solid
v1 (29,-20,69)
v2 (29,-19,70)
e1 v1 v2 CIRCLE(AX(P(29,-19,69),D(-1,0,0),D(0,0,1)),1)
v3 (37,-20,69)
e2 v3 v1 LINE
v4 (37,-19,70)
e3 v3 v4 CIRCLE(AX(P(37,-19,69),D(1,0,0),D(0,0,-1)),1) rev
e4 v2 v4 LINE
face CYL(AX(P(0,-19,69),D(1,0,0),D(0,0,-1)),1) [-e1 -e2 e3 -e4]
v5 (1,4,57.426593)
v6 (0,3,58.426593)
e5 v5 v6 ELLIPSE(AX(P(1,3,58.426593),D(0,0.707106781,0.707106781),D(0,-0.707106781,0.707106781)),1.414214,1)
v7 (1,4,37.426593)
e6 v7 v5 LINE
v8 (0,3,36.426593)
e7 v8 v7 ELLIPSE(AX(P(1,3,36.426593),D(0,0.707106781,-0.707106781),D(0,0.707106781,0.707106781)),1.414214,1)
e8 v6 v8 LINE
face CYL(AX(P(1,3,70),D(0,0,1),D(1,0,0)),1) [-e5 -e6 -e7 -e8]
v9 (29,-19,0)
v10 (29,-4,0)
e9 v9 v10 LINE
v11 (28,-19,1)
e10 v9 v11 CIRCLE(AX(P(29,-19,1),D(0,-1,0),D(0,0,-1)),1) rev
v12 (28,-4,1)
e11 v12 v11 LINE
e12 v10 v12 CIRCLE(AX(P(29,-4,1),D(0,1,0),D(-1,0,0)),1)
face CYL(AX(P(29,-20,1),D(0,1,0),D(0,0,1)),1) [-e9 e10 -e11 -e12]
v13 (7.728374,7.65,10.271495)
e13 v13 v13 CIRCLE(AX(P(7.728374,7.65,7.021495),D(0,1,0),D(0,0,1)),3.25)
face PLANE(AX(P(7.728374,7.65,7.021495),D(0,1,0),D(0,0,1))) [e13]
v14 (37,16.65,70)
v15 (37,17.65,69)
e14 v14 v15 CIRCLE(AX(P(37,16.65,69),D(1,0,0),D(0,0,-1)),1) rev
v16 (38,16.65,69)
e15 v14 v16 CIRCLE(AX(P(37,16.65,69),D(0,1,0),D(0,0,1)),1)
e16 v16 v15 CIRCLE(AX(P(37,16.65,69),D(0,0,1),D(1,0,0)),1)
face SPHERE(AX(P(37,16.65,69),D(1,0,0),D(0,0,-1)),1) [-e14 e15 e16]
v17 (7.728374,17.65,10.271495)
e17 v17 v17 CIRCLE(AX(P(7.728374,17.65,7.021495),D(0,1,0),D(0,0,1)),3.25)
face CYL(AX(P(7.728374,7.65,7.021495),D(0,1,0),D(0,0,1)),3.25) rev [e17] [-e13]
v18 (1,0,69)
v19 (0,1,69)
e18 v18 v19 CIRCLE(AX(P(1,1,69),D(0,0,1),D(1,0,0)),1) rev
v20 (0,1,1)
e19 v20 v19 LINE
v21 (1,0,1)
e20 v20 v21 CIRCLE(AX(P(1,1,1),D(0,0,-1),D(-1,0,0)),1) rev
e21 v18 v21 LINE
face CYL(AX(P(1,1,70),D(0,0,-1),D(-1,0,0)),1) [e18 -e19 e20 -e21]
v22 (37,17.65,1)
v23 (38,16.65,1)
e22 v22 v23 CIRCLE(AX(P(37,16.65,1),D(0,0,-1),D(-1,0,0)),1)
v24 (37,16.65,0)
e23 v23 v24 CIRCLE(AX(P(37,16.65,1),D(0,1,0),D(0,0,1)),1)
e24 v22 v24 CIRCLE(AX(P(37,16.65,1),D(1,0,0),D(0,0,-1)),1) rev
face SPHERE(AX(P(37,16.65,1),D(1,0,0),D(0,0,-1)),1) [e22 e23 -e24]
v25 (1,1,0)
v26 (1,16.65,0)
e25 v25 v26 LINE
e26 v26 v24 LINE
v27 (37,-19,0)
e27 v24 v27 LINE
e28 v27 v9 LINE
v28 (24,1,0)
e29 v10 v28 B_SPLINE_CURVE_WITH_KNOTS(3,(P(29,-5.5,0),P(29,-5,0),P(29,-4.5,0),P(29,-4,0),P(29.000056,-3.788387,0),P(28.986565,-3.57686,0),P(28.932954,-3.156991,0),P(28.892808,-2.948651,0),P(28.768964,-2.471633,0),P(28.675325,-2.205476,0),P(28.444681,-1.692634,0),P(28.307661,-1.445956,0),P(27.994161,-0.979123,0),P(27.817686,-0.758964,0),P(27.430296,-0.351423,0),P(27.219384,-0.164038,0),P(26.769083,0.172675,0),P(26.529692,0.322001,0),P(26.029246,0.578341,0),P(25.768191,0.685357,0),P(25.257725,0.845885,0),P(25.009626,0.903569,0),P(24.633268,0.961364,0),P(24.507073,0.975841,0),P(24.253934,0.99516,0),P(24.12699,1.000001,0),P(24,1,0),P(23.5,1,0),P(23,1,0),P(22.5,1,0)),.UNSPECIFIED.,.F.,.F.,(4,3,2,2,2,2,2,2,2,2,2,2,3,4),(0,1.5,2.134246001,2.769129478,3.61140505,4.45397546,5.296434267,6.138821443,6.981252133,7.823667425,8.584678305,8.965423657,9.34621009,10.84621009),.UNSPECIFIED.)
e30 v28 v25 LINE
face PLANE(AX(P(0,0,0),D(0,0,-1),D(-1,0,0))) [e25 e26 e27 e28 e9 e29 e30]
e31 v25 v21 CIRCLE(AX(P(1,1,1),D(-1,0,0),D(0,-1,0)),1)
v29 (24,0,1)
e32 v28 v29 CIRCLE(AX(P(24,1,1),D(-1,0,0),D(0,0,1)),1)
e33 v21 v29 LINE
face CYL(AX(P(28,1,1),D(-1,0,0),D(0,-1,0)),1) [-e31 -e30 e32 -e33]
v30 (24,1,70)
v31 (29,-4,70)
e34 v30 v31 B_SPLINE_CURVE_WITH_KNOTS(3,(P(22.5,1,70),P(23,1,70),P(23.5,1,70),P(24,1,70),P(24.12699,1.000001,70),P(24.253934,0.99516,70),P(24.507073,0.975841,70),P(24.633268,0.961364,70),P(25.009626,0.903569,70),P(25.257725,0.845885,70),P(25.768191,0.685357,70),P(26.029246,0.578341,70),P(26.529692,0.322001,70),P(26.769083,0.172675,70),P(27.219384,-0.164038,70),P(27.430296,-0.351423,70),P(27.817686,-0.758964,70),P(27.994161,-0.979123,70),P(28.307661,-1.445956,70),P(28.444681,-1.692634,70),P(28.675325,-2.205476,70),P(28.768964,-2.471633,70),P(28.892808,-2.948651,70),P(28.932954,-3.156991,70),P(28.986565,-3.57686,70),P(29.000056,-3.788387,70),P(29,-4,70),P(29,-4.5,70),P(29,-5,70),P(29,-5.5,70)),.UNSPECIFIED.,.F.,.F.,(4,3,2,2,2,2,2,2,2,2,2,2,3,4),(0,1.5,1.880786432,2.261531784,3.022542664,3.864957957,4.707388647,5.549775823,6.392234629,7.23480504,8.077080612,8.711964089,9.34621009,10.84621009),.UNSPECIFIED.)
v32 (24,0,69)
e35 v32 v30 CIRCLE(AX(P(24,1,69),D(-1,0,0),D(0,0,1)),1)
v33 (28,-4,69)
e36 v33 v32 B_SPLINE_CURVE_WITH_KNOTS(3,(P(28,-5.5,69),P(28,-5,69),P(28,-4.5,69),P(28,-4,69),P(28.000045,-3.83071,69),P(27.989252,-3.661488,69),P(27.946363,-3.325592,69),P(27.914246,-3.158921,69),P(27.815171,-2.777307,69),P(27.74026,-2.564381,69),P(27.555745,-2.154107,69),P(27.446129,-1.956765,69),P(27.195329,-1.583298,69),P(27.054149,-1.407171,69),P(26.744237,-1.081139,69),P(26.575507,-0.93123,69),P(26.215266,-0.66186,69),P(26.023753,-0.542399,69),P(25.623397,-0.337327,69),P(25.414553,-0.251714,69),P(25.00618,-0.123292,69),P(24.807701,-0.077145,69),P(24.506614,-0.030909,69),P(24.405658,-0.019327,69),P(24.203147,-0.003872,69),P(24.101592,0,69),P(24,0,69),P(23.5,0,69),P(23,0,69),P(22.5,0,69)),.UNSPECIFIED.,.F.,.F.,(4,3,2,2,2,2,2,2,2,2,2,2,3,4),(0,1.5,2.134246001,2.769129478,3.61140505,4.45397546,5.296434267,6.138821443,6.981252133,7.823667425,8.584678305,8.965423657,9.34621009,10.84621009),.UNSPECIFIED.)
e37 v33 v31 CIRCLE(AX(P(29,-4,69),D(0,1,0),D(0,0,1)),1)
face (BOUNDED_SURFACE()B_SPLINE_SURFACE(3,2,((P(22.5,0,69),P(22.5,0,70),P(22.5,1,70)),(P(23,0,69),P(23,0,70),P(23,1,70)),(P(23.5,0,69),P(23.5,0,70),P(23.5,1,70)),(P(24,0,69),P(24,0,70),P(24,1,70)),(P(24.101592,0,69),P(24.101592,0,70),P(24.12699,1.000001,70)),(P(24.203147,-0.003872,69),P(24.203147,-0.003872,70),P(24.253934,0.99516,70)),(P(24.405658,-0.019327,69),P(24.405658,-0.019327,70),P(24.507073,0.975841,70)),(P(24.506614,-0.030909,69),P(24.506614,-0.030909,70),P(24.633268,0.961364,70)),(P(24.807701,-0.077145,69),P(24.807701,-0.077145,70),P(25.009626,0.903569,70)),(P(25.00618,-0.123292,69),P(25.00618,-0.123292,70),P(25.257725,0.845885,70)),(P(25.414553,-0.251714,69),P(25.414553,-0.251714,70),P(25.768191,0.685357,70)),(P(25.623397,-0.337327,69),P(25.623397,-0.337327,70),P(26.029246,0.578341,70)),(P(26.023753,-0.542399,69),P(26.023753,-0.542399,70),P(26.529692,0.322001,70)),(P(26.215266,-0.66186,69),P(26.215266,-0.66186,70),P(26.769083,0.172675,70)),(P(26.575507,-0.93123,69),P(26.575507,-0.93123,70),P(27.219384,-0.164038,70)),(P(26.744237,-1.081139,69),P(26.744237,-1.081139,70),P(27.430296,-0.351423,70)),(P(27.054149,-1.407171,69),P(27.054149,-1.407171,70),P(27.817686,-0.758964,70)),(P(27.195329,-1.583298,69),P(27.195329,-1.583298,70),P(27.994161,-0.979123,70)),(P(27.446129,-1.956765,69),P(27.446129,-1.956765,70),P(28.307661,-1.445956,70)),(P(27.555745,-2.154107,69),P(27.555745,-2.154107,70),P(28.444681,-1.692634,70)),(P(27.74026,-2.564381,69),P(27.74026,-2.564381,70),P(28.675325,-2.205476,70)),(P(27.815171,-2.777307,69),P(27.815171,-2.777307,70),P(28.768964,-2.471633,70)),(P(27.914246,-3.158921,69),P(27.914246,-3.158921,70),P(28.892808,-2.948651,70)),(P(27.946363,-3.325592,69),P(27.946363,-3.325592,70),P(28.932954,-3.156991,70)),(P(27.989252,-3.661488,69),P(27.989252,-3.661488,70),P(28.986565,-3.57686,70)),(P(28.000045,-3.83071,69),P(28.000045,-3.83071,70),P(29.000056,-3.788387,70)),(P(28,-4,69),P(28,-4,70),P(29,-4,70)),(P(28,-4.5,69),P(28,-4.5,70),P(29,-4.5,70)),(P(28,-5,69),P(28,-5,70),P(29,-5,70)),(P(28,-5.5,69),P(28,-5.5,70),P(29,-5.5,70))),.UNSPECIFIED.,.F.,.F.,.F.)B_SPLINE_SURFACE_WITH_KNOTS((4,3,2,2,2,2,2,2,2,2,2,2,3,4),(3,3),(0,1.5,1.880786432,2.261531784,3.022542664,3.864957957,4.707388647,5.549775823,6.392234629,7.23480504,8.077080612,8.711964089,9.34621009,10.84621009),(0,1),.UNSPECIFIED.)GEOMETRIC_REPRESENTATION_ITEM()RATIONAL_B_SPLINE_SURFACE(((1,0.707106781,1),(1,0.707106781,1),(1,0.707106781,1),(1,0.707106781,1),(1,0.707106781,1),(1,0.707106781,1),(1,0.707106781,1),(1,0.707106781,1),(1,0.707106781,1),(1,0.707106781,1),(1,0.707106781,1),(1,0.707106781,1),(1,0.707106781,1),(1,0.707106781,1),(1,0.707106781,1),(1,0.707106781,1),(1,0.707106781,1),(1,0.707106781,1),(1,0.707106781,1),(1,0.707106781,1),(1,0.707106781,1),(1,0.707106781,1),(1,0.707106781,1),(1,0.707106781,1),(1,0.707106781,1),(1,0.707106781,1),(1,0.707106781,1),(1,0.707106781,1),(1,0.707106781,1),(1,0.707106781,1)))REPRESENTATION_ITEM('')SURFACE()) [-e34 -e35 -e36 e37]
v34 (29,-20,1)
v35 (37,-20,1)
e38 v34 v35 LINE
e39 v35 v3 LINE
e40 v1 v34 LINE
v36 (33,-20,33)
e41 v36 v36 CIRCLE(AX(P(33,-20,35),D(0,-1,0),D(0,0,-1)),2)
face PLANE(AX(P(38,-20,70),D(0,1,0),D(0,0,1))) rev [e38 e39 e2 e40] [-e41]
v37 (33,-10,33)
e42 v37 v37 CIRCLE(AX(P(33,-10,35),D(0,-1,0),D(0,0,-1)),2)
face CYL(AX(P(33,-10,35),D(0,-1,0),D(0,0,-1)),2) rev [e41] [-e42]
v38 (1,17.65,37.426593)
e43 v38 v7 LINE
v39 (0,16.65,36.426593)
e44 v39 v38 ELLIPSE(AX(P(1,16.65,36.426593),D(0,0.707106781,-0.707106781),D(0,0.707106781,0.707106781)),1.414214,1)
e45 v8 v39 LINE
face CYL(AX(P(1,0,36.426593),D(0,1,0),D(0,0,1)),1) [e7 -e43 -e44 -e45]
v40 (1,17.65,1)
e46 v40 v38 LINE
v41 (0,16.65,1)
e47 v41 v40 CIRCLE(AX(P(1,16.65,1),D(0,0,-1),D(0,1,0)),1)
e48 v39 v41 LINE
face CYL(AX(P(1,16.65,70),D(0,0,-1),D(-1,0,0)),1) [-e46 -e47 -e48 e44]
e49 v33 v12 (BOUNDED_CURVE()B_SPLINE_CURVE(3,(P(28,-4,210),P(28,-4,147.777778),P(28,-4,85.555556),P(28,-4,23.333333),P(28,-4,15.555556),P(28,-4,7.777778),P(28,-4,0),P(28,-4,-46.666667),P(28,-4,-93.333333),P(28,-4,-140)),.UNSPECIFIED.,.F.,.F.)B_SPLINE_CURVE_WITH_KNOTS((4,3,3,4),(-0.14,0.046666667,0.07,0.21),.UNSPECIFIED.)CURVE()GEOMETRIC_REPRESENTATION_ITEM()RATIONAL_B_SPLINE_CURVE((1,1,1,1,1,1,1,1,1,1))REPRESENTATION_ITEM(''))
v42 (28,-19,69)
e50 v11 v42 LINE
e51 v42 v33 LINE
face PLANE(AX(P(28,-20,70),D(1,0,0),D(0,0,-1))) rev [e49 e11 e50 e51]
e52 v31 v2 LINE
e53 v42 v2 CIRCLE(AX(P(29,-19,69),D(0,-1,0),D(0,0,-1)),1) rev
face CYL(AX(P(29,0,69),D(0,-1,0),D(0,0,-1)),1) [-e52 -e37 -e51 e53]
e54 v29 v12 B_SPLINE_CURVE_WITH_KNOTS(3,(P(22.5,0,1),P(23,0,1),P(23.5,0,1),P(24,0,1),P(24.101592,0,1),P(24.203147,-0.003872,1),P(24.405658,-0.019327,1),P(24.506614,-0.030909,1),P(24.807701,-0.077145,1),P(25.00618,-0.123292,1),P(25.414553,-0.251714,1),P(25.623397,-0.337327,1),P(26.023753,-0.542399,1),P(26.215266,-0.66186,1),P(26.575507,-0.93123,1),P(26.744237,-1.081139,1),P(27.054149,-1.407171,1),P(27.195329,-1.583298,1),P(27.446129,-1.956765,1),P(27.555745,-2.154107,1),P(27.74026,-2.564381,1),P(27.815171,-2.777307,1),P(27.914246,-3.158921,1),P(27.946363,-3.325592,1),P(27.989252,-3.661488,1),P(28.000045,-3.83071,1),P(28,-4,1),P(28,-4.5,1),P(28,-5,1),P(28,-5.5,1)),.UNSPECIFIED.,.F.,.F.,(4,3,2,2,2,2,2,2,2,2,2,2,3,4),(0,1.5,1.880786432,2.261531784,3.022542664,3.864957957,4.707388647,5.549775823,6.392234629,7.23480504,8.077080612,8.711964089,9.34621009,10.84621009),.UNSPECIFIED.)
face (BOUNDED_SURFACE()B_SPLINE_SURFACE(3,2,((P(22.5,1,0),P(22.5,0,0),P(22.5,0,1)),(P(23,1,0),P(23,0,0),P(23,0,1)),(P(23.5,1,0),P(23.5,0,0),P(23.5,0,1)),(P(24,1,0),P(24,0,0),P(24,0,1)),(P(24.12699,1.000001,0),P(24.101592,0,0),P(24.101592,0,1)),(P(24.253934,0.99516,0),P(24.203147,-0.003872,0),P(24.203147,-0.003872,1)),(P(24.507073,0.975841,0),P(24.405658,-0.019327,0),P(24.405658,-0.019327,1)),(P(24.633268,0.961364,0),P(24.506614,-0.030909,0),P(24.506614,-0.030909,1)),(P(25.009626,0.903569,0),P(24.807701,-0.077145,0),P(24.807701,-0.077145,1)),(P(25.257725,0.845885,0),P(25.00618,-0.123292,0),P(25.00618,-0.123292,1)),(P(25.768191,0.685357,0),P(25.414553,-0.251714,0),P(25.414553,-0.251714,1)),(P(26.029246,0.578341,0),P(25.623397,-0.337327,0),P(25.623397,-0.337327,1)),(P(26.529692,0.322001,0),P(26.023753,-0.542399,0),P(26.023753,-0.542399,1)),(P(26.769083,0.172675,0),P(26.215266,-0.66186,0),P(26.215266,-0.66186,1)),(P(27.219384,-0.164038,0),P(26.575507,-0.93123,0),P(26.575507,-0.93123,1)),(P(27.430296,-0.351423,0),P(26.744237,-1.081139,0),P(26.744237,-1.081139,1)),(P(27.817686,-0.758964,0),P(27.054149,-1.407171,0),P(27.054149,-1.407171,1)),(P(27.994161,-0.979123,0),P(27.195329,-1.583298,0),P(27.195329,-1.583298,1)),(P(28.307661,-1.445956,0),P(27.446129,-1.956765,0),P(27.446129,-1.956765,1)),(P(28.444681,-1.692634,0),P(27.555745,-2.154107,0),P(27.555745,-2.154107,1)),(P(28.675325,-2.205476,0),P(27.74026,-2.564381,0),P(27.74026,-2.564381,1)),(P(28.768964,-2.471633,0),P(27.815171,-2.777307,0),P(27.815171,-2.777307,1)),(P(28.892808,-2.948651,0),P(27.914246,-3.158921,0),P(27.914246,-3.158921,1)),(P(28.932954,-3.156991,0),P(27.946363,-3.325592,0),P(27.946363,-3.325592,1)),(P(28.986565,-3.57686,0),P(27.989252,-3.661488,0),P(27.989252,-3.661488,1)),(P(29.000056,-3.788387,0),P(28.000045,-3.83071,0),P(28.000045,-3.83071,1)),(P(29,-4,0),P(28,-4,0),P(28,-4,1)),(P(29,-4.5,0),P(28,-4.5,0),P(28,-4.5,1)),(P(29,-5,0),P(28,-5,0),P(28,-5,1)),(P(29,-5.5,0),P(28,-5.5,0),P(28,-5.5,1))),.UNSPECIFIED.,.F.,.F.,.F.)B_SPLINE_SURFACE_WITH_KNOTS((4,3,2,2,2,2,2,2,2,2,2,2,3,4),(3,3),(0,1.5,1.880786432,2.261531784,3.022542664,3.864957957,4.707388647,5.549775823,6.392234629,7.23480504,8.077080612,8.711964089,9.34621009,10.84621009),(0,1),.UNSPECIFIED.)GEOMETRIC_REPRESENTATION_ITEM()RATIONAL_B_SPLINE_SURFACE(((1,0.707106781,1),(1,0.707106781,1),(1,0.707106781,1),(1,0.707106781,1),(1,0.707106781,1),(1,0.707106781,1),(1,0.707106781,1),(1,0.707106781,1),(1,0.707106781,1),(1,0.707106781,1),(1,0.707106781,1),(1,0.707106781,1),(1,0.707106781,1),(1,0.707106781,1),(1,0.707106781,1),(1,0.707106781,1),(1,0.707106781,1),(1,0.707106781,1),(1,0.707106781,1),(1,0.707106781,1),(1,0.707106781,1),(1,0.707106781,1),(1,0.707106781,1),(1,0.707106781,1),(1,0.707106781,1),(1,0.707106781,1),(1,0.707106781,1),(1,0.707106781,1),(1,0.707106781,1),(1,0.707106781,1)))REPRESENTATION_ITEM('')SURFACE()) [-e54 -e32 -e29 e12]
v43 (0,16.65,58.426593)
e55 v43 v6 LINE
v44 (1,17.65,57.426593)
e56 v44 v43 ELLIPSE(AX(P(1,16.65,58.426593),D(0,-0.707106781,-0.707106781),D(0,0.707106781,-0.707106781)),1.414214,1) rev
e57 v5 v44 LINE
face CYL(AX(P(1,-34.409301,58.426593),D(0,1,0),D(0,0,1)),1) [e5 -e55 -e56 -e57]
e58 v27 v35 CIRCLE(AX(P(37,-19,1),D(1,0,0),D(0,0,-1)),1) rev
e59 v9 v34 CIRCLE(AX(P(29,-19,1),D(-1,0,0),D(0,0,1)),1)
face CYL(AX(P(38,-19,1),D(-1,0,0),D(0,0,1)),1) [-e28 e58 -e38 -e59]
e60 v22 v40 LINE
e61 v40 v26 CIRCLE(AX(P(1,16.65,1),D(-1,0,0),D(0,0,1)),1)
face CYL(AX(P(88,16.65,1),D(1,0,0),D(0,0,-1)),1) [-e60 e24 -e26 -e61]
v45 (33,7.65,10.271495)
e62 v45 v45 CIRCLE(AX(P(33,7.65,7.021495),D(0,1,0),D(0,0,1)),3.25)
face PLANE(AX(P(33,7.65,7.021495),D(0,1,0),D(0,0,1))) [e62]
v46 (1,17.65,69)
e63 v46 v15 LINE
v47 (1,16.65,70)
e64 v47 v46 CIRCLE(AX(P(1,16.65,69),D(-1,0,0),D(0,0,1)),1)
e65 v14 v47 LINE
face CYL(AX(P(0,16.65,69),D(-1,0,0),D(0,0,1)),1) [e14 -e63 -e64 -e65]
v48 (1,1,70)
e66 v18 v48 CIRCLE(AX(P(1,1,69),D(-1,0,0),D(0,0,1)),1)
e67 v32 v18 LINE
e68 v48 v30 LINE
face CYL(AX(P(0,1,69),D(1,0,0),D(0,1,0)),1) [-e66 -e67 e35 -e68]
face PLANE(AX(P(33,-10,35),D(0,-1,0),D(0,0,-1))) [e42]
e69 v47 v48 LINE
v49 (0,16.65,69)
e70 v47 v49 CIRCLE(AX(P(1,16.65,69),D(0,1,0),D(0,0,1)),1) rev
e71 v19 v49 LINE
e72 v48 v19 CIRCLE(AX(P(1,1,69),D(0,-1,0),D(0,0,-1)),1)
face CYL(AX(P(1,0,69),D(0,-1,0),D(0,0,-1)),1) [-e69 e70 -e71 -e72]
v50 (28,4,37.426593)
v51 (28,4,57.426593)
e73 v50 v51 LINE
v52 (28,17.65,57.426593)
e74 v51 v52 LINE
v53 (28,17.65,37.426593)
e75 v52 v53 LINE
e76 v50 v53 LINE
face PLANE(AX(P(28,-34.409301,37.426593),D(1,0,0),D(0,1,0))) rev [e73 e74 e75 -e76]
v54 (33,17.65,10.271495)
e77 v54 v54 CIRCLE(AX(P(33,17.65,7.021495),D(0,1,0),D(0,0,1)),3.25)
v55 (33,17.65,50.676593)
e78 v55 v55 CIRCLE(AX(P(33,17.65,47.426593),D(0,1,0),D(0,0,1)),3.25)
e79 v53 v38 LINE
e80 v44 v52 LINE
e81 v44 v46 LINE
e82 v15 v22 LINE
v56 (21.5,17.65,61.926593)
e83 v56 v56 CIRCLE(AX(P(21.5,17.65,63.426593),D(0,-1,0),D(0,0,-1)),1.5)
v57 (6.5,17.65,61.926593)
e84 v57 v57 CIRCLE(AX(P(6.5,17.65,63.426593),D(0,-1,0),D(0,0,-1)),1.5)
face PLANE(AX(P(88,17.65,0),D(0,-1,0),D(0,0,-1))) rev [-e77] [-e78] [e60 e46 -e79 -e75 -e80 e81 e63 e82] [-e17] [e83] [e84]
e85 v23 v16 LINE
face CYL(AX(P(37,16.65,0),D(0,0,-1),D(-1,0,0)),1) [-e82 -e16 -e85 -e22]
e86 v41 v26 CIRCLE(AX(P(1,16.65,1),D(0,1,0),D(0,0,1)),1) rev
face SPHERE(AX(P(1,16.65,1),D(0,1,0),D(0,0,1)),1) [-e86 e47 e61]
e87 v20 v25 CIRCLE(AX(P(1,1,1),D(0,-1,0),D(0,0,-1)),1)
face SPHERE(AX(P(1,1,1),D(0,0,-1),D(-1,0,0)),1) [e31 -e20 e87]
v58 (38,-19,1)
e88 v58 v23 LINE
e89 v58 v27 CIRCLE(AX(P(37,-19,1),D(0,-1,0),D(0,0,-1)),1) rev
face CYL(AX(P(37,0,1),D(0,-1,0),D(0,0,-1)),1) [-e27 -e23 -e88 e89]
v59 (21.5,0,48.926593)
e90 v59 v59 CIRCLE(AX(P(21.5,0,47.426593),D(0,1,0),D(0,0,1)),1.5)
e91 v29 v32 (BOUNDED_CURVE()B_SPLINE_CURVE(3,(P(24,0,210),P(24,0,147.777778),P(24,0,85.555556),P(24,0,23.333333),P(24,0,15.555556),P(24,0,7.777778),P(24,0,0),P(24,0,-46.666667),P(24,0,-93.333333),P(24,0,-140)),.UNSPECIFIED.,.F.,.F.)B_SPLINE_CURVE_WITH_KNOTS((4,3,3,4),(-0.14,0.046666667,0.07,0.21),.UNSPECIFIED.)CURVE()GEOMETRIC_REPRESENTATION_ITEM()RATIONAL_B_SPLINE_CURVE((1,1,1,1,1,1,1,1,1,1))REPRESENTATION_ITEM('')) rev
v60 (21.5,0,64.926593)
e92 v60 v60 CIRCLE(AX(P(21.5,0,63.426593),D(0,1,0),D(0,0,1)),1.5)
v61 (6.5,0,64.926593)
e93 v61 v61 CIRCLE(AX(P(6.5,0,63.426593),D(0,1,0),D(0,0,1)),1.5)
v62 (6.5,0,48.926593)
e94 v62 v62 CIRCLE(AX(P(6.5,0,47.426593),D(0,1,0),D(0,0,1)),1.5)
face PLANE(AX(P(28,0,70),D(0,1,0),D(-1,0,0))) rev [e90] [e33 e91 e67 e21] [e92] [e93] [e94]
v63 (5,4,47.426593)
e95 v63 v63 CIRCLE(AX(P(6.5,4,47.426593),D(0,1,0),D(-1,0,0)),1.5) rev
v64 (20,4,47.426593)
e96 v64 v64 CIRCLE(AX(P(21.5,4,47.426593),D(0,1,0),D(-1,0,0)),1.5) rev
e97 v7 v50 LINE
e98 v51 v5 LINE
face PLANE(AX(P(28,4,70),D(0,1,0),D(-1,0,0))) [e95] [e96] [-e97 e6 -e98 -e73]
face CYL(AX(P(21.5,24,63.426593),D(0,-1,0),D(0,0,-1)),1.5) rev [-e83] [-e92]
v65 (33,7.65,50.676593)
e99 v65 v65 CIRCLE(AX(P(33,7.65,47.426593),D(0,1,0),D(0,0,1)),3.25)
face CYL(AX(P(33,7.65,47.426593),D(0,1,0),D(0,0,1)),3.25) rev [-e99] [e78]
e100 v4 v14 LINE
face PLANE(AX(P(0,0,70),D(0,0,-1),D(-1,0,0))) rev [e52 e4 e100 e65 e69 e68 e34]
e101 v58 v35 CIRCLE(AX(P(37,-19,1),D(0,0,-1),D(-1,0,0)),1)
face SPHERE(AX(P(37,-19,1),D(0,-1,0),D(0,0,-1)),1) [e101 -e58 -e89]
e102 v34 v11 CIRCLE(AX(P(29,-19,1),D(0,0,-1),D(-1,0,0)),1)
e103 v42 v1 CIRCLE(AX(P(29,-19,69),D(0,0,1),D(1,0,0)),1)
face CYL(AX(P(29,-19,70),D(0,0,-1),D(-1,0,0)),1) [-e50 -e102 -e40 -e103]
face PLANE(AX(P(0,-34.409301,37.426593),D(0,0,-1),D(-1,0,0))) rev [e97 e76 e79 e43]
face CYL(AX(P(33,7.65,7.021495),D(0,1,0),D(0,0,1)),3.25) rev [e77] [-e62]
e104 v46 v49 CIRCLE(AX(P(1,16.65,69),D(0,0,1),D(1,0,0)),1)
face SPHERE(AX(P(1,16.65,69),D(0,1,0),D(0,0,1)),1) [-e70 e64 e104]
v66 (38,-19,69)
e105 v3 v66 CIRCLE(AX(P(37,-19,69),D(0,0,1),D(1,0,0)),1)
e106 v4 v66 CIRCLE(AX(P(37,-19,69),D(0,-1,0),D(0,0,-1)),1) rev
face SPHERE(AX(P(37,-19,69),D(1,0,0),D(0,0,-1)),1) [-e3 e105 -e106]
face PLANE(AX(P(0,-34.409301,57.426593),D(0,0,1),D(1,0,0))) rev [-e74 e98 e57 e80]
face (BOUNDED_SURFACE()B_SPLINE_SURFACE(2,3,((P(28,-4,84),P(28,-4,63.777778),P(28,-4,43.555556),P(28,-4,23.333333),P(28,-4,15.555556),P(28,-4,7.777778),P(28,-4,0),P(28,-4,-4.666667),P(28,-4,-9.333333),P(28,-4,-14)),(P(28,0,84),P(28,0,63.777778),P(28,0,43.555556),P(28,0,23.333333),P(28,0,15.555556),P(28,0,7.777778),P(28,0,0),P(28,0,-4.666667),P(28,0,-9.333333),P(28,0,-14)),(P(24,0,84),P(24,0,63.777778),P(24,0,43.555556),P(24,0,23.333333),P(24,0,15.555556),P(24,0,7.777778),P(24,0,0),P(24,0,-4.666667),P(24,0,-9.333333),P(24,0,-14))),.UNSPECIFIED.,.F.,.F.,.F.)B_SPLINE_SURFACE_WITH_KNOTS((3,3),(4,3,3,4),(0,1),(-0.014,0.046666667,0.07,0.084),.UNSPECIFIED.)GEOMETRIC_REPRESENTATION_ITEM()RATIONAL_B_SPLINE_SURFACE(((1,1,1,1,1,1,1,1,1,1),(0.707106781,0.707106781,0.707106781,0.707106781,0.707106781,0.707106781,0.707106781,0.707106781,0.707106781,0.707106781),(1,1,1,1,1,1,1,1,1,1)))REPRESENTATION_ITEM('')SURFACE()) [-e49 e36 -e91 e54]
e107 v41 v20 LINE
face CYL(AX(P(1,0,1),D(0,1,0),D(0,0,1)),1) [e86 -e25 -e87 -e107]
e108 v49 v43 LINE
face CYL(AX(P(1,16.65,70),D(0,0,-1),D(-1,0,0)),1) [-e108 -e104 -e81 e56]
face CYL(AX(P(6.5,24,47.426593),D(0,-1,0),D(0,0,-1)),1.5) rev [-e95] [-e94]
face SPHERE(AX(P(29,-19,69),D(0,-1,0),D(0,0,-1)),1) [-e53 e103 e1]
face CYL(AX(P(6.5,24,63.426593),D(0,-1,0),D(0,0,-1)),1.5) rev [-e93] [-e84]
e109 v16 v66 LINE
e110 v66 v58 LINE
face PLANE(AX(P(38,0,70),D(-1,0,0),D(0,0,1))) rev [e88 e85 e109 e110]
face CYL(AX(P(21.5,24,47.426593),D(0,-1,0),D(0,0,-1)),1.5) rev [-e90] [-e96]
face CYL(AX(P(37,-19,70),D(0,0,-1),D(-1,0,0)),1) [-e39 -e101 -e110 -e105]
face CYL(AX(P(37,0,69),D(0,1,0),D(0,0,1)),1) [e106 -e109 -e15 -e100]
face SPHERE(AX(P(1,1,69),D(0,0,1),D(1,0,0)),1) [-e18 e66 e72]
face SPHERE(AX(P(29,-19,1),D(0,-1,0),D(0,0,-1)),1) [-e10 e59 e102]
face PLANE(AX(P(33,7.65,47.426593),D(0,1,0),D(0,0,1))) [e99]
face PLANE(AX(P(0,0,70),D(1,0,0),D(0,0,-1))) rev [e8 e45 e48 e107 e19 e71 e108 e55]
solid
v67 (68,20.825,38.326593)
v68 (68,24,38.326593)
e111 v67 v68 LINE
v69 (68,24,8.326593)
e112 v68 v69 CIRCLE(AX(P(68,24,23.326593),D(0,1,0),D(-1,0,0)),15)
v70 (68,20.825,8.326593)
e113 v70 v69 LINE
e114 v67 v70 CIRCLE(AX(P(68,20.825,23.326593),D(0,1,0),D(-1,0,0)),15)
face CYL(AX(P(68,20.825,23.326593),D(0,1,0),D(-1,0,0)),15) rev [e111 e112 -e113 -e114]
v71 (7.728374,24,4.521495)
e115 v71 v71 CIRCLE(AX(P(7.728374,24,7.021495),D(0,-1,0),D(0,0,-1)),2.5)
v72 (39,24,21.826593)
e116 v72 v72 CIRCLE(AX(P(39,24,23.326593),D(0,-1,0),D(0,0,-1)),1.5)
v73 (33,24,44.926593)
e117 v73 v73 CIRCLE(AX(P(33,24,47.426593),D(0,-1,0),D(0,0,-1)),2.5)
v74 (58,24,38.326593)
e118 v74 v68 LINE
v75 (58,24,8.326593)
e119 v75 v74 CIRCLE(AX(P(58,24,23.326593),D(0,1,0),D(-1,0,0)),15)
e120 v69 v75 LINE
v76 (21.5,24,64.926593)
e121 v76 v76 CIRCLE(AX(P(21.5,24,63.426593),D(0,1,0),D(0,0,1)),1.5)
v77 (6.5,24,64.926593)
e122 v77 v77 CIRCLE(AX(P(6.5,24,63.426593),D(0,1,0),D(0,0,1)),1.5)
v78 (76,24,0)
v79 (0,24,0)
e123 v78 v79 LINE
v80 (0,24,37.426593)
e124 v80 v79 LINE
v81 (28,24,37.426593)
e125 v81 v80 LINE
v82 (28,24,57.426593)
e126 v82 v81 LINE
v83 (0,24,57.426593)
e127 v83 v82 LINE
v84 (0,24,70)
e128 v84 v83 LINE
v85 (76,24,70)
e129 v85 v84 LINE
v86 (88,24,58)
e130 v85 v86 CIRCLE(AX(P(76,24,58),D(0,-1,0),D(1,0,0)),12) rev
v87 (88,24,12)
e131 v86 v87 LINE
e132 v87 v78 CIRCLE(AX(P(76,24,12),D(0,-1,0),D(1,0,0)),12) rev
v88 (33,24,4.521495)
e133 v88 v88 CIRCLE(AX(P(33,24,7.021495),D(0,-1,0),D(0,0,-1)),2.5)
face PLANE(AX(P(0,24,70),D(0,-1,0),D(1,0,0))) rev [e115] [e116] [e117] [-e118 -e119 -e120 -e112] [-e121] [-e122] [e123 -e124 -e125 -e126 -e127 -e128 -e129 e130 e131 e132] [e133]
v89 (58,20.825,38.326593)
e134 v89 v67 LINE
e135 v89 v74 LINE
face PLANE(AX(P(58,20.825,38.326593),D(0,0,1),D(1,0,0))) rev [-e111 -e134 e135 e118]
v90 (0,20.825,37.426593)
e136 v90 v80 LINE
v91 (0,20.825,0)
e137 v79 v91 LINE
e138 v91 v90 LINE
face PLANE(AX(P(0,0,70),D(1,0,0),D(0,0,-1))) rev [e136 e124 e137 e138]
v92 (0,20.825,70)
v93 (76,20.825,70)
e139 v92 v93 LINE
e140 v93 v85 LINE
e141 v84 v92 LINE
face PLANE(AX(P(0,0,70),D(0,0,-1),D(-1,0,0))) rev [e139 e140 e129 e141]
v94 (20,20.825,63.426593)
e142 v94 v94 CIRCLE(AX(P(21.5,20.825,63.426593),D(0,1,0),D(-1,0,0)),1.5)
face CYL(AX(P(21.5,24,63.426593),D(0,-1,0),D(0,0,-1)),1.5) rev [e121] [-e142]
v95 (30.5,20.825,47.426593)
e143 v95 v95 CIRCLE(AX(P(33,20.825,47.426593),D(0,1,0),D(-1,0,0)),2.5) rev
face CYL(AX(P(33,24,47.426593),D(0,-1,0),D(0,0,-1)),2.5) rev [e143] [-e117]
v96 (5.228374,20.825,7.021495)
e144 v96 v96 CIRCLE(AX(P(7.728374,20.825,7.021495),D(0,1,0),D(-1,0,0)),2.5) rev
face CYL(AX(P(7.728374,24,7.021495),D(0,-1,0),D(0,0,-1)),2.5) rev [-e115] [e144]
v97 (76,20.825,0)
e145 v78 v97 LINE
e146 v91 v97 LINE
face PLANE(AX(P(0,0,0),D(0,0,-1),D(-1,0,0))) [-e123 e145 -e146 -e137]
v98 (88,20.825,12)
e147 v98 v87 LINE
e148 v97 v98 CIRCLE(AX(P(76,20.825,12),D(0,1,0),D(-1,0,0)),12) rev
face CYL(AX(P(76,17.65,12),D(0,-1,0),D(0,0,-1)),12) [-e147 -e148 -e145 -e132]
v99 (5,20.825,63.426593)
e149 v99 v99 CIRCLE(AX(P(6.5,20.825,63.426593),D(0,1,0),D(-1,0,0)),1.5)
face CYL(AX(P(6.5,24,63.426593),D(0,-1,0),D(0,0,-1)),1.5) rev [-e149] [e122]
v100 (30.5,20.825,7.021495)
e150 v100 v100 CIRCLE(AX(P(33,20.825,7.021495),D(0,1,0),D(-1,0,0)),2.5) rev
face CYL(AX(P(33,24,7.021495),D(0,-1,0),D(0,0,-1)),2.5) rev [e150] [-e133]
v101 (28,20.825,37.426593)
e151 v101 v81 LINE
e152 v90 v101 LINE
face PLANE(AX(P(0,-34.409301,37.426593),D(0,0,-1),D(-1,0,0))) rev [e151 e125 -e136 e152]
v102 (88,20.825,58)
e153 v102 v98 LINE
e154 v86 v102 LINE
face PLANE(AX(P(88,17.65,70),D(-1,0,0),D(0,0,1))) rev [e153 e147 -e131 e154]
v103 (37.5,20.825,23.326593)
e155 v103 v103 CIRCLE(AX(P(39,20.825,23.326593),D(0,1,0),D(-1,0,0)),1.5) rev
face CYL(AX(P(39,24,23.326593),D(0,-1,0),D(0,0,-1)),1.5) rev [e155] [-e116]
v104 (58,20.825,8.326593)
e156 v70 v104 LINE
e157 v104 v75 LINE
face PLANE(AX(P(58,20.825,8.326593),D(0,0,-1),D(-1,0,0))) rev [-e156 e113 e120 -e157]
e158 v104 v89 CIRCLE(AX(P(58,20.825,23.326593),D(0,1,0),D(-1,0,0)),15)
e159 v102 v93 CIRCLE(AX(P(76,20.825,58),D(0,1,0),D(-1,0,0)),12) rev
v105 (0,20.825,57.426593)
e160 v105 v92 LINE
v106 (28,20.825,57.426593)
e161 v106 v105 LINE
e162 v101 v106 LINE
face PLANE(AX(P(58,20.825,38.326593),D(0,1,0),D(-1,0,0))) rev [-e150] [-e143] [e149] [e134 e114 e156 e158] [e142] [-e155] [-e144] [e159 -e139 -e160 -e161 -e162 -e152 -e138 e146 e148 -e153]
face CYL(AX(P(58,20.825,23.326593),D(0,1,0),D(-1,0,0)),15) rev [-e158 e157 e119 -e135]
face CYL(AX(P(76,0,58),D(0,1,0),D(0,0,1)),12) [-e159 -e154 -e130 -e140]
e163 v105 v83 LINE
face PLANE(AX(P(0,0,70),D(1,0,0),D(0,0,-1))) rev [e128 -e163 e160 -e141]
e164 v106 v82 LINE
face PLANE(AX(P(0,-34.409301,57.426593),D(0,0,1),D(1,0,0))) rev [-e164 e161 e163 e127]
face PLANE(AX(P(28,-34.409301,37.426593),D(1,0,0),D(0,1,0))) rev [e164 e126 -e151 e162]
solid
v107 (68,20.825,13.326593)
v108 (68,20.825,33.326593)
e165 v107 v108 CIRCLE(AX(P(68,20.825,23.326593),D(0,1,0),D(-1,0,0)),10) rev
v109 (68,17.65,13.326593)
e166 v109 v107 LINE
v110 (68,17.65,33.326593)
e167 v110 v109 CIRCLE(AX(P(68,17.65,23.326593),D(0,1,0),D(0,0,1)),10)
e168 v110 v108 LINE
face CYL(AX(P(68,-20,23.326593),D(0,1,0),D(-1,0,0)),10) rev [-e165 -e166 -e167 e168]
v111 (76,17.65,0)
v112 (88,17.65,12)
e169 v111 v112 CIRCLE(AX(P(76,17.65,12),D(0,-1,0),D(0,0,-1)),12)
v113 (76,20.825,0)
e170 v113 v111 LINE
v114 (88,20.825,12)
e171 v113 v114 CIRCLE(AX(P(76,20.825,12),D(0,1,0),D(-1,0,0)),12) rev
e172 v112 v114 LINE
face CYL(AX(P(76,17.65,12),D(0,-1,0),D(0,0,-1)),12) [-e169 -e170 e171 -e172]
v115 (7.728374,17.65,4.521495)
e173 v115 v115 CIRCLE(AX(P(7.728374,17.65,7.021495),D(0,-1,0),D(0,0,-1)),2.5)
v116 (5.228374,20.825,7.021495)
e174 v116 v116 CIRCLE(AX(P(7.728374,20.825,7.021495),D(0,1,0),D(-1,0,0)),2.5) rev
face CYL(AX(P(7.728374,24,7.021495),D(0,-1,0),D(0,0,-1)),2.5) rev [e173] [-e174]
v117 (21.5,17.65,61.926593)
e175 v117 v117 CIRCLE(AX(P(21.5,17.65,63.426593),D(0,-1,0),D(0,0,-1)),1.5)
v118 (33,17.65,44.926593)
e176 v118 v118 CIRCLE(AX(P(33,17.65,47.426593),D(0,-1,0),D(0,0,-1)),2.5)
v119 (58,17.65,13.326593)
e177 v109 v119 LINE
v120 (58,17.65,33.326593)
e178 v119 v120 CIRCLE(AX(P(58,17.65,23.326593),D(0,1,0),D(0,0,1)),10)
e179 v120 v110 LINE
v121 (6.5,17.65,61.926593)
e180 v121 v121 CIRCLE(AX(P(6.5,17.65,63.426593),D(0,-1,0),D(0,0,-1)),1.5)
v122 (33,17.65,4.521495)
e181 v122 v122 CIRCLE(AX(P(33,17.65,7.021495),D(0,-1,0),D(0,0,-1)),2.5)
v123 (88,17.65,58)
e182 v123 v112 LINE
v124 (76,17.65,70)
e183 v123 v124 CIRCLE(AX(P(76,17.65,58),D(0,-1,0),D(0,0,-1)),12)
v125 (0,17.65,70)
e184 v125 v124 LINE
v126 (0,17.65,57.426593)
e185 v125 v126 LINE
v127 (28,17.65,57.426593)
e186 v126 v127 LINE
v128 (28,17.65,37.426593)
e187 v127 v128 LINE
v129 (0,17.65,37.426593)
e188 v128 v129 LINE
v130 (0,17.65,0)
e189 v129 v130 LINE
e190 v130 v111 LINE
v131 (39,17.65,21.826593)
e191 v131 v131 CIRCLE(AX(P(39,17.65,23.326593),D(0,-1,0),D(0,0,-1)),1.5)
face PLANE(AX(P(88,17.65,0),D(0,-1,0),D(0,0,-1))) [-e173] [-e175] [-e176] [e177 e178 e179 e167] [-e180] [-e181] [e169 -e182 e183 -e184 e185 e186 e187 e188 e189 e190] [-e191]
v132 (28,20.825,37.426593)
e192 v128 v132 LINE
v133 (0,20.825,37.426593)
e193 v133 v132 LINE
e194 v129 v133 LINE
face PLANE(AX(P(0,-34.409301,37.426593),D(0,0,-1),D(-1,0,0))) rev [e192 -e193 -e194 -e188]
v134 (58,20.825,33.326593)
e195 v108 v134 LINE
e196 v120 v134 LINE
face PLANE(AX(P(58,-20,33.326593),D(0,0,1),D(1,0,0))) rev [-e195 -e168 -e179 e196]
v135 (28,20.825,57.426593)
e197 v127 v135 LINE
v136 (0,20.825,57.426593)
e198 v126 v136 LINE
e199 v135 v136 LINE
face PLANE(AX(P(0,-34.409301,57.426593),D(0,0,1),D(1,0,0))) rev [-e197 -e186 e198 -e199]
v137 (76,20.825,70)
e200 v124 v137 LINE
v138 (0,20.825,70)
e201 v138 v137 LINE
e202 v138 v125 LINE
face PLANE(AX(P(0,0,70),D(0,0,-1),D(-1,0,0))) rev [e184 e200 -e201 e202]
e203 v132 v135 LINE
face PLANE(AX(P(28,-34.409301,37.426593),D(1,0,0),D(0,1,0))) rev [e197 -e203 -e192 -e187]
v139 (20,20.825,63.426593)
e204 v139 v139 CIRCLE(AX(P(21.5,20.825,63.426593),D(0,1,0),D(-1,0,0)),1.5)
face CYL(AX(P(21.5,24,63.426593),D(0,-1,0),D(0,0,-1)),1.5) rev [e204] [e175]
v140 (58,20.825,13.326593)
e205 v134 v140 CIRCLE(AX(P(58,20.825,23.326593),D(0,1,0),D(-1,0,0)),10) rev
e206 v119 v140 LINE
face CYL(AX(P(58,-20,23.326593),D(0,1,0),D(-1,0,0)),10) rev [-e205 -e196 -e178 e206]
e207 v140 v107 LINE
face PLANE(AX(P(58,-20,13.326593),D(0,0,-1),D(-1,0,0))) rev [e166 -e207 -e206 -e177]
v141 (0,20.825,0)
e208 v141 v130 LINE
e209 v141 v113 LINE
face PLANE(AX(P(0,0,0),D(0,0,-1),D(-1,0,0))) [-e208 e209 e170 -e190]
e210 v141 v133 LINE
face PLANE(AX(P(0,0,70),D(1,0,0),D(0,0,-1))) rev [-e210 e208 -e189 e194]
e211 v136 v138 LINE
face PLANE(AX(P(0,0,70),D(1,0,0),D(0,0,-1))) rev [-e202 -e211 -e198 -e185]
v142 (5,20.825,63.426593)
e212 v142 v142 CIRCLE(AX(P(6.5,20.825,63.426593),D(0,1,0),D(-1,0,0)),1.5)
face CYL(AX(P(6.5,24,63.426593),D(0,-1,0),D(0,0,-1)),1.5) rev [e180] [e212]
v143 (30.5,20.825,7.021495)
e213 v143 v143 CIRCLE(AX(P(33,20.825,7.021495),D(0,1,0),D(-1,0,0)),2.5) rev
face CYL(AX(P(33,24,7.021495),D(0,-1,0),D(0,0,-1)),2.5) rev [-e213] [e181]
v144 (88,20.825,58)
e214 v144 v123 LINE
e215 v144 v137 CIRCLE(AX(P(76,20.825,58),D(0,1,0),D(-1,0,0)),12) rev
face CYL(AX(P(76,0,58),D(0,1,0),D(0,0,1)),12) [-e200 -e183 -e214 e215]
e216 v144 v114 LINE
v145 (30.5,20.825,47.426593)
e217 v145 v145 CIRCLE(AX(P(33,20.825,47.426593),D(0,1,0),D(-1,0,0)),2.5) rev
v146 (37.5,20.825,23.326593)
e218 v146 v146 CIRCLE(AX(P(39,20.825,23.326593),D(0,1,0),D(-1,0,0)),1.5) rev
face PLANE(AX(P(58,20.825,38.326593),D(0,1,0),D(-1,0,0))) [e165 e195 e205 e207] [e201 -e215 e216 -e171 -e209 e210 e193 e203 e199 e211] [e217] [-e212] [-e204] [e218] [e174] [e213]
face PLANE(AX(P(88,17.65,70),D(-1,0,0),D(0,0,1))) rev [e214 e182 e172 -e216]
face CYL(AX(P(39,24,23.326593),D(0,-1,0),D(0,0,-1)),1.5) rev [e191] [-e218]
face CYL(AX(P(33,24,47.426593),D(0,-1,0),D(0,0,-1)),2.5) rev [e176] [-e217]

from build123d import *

# Parameters (mm, degrees)
BOSS_EXTRUDE1_DEPTH = 70
SKETCH5_W           = 28
SKETCH5_H           = 20
CUT_EXTRUDE2_DEPTH  = 20
CUT_EXTRUDE10_DEPTH = 121.747670785
CUT_EXTRUDE11_DEPTH = 3.175
SKETCH2_R           = 1.5
CUT_EXTRUDE1_DEPTH  = 115.978258814
SKETCH23_R          = 3.25
CUT_EXTRUDE12_DEPTH = 10
SKETCH24_R          = 2.5
SKETCH24_R_2        = 1.5
CUT_EXTRUDE13_DEPTH = 119.581290683
VARFILLET1_DEPTH    = 70
FILLET1_R           = 12
FILLET3_R           = 1
SKETCH27_R          = 2
CUT_EXTRUDE14_DEPTH = 10


with BuildPart() as part:
    # Sketch1 → Boss-Extrude1 (new body)
    with BuildSketch(Plane.XY):
        Polygon((0, 0), (0, 24), (38, 24), (88, 24), (88, 17.65), (38, 17.65), (38, 0), (38, -20), (28, -20), (28, 0), align=None)
    extrude(amount=BOSS_EXTRUDE1_DEPTH)

    # Sketch5 → Cut-Extrude2 (cut)
    with BuildSketch(Plane(origin=(0, 24, 0), x_dir=(1, 0, 0), z_dir=(0, 1, 0))):
        with Locations((14, -47.426593036)):
            Rectangle(SKETCH5_W, SKETCH5_H)
    extrude(amount=-CUT_EXTRUDE2_DEPTH, mode=Mode.SUBTRACT)

    # Sketch21 → Cut-Extrude10 (cut, through all)
    with BuildSketch(Plane(origin=(0, 24, 0), x_dir=(1, 0, 0), z_dir=(0, 1, 0))):
        with BuildLine():
            Line((58, -13.326593036), (68, -13.326593036))
            ThreePointArc((68, -13.326593036), (78, -23.326593036), (68, -33.326593036))
            Line((68, -33.326593036), (58, -33.326593036))
            ThreePointArc((58, -33.326593036), (48, -23.326593036), (58, -13.326593036))
        make_face()
    extrude(amount=-CUT_EXTRUDE10_DEPTH, mode=Mode.SUBTRACT)

    # Sketch22 → Cut-Extrude11 (cut)
    with BuildSketch(Plane(origin=(0, 24, 0), x_dir=(1, 0, 0), z_dir=(0, 1, 0))):
        with BuildLine():
            Line((58, -8.326593036), (68, -8.326593036))
            ThreePointArc((68, -8.326593036), (83, -23.326593036), (68, -38.326593036))
            Line((68, -38.326593036), (58, -38.326593036))
            ThreePointArc((58, -38.326593036), (43, -23.326593036), (58, -8.326593036))
        make_face()
    extrude(amount=-CUT_EXTRUDE11_DEPTH, mode=Mode.SUBTRACT)

    # Sketch2 → Cut-Extrude1 (cut, through all)
    with BuildSketch(Plane(origin=(0, 0, 0), x_dir=(1, 0, 0), z_dir=(0, 1, 0))):
        with Locations(Location((6.5, -47.426593036, 0), (0, 0, 180))):
            Circle(SKETCH2_R)
        with Locations(Location((6.5, -63.426593036, 0), (0, 0, 270))):
            Circle(SKETCH2_R)
        with Locations(Location((21.5, -63.426593036, 0), (0, 0, 270))):
            Circle(SKETCH2_R)
        with Locations(Location((21.5, -47.426593036, 0), (0, 0, 180))):
            Circle(SKETCH2_R)
    extrude(amount=CUT_EXTRUDE1_DEPTH, mode=Mode.SUBTRACT)


with BuildPart() as body_2:
    # Split1: read off the stored shape, not the designer's step
    # Split1: the piece on the far side of the plane
    add(part.part)
    split(bisect_by=Plane(origin=(0, 17.65, 0), x_dir=(1, 0, 0), z_dir=(0, 1, 0)), keep=Keep.BOTTOM)

    # Sketch23 → Cut-Extrude12 (cut)
    with BuildSketch(Plane(origin=(0, 17.65, 0), x_dir=(1, 0, 0), z_dir=(0, 1, 0))):
        with Locations(Location((33, -47.426593036, 0), (0, 0, 270))):
            Circle(SKETCH23_R)
        with Locations(Location((7.728374454, -7.021494916, 0), (0, 0, 270))):
            Circle(SKETCH23_R)
        with Locations(Location((33, -7.021494916, 0), (0, 0, 270))):
            Circle(SKETCH23_R)
    extrude(amount=-CUT_EXTRUDE12_DEPTH, mode=Mode.SUBTRACT)

    # VarFillet1: read off the stored shape, not the designer's step
    # VarFillet1 outline → VarFillet1 (add)
    with BuildSketch(Plane.XY):
        with BuildLine():
            add(Edge.make_bspline(
                [(28, -4), (28, 0), (24, 0)],
                knots=[0, 0, 0, 1, 1, 1], degree=2, weights=[1, 0.707106781, 1]))
            Line((28, -4), (28, 0))
            Line((28, 0), (24, 0))
        make_face()
    extrude(amount=VARFILLET1_DEPTH)

    # Fillet3
    fillet3_edges = [body_2.edges().sort_by_distance(p)[0] for p in [
        (0, 0, 35),
        (0, 10.825, 37.426593036),
        (0, 17.65, 18.713296518),
        (0, 4, 47.426593036),
        (0, 10.825, 57.426593036),
        (0, 8.825, 70),
        (0, 17.65, 63.713296518),
        (28, -20, 35),
        (38, -20, 35),
        (0, 8.825, 0),
        (12, 0, 0),
        (26.828426796, -1.171572546, 0),
        (28, -12, 0),
        (33, -20, 0),
        (38, -1.175, 0),
        (19, 17.65, 0),
        (38, 17.65, 35),
        (33, -20, 70),
        (28, -12, 70),
        (26.828426796, -1.171572546, 70),
        (12, 0, 70),
        (38, -1.175, 70),
        (19, 17.65, 70),
    ]]
    fillet(fillet3_edges, radius=FILLET3_R)

    # Sketch27 → Cut-Extrude14 (cut)
    with BuildSketch(Plane.XZ.offset(20)):
        with Locations(Location((33, 35, 0), (0, 0, 270))):
            Circle(SKETCH27_R)
    extrude(amount=-CUT_EXTRUDE14_DEPTH, mode=Mode.SUBTRACT)


with BuildPart() as part_1:
    add(part.part)

    # Split1
    split(bisect_by=Plane(origin=(0, 17.65, 0), x_dir=(1, 0, 0), z_dir=(0, 1, 0)), keep=Keep.TOP)

    # Sketch24 → Cut-Extrude13 (cut, through all)
    with BuildSketch(Plane.XZ.offset(-17.65)):
        with Locations(Location((33, 47.426593036, 0), (0, 0, 270))):
            Circle(SKETCH24_R)
        with Locations(Location((7.728374454, 7.021494916, 0), (0, 0, 270))):
            Circle(SKETCH24_R)
        with Locations(Location((39, 23.326593036, 0), (0, 0, 270))):
            Circle(SKETCH24_R_2)
        with Locations(Location((33, 7.021494916, 0), (0, 0, 270))):
            Circle(SKETCH24_R)
    extrude(amount=-CUT_EXTRUDE13_DEPTH, mode=Mode.SUBTRACT)

    # Fillet1
    fillet1_edges = [part_1.edges().sort_by_distance(p)[0] for p in [
        (88, 20.825, 0),
        (88, 20.825, 70),
    ]]
    fillet(fillet1_edges, radius=FILLET1_R)


with BuildPart() as body_3:
    # Split2: read off the stored shape, not the designer's step
    # Split2: the piece on the far side of the plane
    add(part_1.part)
    split(bisect_by=Plane(origin=(0, 20.825, 0), x_dir=(1, 0, 0), z_dir=(0, 1, 0)), keep=Keep.BOTTOM)


with BuildPart() as part_2:
    add(part_1.part)

    # Split2
    split(bisect_by=Plane(origin=(0, 20.825, 0), x_dir=(1, 0, 0), z_dir=(0, 1, 0)), keep=Keep.TOP)


solid = Compound([body_2.part, body_3.part, part_2.part])
